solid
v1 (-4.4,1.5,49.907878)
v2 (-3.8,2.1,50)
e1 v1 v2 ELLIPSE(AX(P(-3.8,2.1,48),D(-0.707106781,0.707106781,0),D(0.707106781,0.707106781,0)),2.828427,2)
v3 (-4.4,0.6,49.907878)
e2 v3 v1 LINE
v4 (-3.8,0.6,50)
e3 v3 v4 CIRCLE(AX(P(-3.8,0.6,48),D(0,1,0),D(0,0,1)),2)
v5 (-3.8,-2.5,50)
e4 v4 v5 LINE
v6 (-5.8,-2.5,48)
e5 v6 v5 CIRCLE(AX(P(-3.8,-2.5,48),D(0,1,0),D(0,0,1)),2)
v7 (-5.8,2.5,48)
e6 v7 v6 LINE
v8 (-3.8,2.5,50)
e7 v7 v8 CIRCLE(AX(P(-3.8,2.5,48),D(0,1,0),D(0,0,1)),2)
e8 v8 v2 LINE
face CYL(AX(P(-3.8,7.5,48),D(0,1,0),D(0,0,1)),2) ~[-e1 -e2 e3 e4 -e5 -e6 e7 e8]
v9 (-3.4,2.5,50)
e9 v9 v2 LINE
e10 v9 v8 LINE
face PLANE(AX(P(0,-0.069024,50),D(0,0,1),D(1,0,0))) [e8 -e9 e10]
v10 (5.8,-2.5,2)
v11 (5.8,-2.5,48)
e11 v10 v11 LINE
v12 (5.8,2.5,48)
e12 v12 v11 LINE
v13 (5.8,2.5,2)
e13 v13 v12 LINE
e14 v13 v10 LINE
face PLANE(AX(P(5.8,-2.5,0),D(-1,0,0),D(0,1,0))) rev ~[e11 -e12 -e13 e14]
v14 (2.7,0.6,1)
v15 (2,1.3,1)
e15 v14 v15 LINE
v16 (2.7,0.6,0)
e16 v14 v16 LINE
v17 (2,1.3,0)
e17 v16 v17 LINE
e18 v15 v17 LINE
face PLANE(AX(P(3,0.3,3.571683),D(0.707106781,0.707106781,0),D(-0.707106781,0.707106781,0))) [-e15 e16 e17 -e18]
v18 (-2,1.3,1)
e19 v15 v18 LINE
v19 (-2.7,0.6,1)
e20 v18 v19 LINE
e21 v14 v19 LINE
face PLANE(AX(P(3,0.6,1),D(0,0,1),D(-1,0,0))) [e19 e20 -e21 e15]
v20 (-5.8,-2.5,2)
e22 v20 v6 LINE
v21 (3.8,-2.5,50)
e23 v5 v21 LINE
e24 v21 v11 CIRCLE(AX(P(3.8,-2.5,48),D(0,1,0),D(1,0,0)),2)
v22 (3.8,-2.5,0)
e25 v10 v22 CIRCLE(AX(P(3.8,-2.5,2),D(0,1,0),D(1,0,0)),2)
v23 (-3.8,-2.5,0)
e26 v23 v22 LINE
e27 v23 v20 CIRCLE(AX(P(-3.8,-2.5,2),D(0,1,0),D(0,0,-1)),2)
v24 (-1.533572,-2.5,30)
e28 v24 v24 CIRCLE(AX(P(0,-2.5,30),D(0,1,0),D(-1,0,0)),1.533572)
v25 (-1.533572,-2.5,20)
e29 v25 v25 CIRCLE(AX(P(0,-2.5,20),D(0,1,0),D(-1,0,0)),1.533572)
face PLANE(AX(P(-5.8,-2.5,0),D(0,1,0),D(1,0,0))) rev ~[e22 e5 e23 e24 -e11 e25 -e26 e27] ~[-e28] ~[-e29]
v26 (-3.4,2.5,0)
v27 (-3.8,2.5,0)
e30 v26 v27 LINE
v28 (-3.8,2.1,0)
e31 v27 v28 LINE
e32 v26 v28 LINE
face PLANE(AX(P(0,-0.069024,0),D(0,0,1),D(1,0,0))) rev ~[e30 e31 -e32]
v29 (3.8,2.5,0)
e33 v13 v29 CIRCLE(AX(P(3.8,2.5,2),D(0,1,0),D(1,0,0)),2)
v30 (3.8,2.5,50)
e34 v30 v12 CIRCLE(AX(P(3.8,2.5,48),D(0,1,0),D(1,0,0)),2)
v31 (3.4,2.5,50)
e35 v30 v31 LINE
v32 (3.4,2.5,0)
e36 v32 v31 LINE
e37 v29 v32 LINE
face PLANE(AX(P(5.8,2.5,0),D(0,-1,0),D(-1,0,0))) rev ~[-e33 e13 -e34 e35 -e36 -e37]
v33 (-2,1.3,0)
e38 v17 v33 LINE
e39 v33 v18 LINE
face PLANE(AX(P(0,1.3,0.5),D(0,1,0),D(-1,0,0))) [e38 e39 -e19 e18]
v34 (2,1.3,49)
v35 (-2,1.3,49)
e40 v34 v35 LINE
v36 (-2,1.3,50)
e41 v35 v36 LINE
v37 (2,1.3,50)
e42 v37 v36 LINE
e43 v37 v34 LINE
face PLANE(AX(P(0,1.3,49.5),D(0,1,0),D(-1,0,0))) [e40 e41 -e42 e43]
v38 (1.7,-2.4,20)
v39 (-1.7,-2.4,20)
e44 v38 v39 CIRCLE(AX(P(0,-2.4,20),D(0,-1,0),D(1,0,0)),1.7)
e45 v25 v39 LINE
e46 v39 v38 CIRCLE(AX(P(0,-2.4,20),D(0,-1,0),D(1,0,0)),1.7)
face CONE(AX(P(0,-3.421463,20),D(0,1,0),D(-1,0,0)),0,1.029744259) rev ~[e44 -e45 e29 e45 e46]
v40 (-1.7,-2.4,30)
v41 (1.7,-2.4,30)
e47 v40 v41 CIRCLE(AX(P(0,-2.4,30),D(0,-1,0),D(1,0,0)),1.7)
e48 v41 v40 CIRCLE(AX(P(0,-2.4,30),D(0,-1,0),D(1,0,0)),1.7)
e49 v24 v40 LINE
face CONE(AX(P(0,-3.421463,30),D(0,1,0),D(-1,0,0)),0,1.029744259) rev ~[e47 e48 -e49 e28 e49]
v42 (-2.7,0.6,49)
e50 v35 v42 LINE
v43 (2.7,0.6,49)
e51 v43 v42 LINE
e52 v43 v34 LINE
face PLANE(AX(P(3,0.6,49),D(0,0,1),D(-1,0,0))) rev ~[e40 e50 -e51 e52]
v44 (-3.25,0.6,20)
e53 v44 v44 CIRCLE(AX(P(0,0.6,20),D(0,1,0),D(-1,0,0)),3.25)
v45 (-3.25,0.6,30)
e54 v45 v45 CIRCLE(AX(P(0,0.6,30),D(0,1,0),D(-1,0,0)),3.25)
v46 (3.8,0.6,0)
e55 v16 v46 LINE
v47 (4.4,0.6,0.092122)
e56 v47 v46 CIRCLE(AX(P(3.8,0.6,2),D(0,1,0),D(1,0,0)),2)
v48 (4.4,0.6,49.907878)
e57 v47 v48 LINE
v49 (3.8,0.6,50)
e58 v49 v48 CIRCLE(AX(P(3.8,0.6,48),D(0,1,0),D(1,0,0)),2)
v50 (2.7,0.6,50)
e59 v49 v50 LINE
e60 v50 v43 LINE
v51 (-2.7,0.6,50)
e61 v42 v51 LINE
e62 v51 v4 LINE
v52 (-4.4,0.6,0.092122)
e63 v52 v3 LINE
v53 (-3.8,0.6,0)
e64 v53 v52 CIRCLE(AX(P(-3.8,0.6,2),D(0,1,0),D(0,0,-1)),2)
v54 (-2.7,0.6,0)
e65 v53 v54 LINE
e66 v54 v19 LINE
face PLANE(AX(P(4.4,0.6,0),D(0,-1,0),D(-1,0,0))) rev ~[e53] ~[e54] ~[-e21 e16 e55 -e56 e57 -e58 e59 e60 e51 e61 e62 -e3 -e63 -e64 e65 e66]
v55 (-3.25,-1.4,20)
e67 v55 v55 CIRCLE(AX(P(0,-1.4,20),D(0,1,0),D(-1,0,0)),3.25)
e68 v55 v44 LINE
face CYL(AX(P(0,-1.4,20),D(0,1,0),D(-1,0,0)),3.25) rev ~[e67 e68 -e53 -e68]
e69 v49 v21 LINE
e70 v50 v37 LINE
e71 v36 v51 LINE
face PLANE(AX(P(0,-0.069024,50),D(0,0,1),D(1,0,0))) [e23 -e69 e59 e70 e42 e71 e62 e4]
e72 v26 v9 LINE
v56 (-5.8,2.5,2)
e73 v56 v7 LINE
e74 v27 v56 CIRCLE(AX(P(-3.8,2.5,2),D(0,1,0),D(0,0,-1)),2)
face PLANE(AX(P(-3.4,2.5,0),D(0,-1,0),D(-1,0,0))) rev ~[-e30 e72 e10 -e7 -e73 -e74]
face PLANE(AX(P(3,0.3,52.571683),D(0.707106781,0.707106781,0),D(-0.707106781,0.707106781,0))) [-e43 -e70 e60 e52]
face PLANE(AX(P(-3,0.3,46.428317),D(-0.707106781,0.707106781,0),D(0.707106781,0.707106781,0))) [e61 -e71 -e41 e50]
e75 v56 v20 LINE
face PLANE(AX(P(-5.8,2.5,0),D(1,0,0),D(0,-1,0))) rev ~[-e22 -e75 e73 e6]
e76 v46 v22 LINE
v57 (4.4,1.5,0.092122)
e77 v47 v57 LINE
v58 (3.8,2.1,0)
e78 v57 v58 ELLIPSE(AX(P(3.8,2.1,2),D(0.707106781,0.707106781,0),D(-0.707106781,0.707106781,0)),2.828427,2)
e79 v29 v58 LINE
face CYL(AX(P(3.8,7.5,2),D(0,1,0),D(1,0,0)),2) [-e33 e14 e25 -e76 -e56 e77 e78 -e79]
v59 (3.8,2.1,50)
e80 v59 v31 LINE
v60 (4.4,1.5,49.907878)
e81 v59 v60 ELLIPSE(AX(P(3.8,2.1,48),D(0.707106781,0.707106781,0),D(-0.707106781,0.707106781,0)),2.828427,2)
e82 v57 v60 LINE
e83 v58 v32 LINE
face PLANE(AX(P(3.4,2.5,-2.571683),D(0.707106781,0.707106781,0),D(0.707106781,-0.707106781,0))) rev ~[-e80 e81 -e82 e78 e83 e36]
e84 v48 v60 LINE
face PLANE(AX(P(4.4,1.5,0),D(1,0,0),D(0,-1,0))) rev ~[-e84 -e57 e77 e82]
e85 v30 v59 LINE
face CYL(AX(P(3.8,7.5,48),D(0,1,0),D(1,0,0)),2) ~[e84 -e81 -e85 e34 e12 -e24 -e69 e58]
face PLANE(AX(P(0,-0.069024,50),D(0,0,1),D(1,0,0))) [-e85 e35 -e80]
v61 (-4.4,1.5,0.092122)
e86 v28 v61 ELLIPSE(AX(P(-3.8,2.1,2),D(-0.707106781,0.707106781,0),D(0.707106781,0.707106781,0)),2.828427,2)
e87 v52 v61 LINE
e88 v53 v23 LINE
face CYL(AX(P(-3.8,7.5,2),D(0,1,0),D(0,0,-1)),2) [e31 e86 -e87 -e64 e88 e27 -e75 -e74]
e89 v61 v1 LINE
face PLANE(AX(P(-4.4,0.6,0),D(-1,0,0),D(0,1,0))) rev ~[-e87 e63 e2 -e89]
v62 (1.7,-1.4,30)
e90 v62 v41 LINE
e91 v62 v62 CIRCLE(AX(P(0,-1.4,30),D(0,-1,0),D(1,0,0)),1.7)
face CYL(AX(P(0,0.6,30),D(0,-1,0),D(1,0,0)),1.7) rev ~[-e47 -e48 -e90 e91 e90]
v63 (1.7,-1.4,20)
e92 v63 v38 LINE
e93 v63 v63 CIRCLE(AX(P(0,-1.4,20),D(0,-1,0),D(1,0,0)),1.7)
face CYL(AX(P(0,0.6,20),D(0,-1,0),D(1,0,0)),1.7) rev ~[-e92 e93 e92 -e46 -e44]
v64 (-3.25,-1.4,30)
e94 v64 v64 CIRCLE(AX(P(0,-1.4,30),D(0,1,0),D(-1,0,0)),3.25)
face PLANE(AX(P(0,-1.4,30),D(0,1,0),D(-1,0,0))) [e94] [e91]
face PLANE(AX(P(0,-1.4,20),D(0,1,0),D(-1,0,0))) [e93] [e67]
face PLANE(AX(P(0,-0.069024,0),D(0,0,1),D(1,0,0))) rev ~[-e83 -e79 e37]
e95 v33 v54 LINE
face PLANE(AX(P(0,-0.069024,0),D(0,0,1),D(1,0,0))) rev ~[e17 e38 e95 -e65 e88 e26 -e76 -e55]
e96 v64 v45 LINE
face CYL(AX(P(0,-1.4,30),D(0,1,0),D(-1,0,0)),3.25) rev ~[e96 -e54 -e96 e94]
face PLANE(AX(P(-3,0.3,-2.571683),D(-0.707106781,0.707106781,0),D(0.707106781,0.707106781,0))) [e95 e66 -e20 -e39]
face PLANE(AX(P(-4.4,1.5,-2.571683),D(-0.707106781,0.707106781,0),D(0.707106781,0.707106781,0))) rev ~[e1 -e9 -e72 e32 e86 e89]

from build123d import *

# Parameters (mm, degrees)
F1_DEPTH       = 50
F3_D           = 3.4
F3_DEPTH       = 3
F3_CBORE_D     = 6.5
F3_CBORE_DEPTH = 2
F3_TIP         = 1.0214630523
F2_W           = 6
F2_H           = 1
F4_DEPTH       = 0.7
F5_T4_DEPTH    = 55.1433659759
F5_T9_DEPTH    = 55.1433659759
F5_T14_DEPTH   = 6.1433659759
F5_T19_DEPTH   = 6.1433659759
F5_T24_DEPTH   = 6.1433659759
F5_T29_DEPTH   = 6.1433659759
F6_T1_DEPTH    = 15


# Not quite as in the source:
# - a fillet or chamfer that OpenCascade refuses, or shapes differently, is made with other operations: its cross-section is extruded or revolved along the edge and cut away or added


with BuildPart() as f1:
    # F0 (on Top) → F1 (new body)
    with BuildSketch(Plane.XY):
        Polygon((-5.8, -2.5), (5.8, -2.5), (5.8, 2.5), (3.4, 2.5), (3.4, 1.5), (4.4, 1.5), (4.4, 0.6), (-4.4, 0.6), (-4.4, 1.5), (-3.4, 1.5), (-3.4, 2.5), (-5.8, 2.5), align=None)
    extrude(amount=F1_DEPTH)

    # F3
    with Locations(Plane(origin=(0, 0.6, 0), x_dir=(-1, 0, 0), z_dir=(0, 1, 0))):
        with Locations((0, 30), (0, 20)):
            CounterBoreHole(F3_D / 2, F3_CBORE_D / 2, F3_CBORE_DEPTH, depth=F3_DEPTH)
            with Locations((0, 0, -(F3_DEPTH + F3_TIP / 2))):  # 118° drill point
                Cone(0, F3_D / 2, F3_TIP, mode=Mode.SUBTRACT)

    # F2 (on face) → F4 (join)
    with BuildSketch(Plane(origin=(0, 0.6, 0), x_dir=(-1, 0, 0), z_dir=(0, 1, 0))):
        with Locations((0, 49.5)):
            Rectangle(F2_W, F2_H)
        with Locations((0, 0.5)):
            Rectangle(F2_W, F2_H)
    extrude(amount=F4_DEPTH)

    # F5: chamfer of 1 on 6 edges, made by hand


with BuildPart() as f5_tool2:
    # F5_s3 → F5_t4 (new body)
    with BuildSketch(Plane.XY.offset(-2.571682988)):
        Polygon((3.4, 2.5), (4.4, 1.5), (3.4, 1.5), align=None)
    extrude(amount=F5_T4_DEPTH)

    split(bisect_by=Plane.YZ.offset(4.4), keep=Keep.BOTTOM)


with BuildPart() as f1_1:
    add(f1.part)

    # F5_t1: cut F5_tool2
    add(f5_tool2.part, mode=Mode.SUBTRACT)


with BuildPart() as f5_tool7:
    # F5_s8 → F5_t9 (new body)
    with BuildSketch(Plane.XY.offset(-2.571682988)):
        Polygon((-4.4, 1.5), (-3.4, 2.5), (-3.4, 1.5), align=None)
    extrude(amount=F5_T9_DEPTH)

    split(bisect_by=Plane.YZ.offset(-4.4), keep=Keep.TOP)


with BuildPart() as f1_2:
    add(f1_1.part)

    # F5_t6: cut F5_tool7
    add(f5_tool7.part, mode=Mode.SUBTRACT)


with BuildPart() as f5_tool12:
    # F5_s13 → F5_t14 (new body)
    with BuildSketch(Plane.XY.offset(-2.571682988)):
        Polygon((-3, 0.3), (-2, 1.3), (-3, 1.3), align=None)
    extrude(amount=F5_T14_DEPTH)

    split(bisect_by=Plane.XZ.offset(-0.6), keep=Keep.BOTTOM)


with BuildPart() as f1_3:
    add(f1_2.part)

    # F5_t11: cut F5_tool12
    add(f5_tool12.part, mode=Mode.SUBTRACT)


with BuildPart() as f5_tool17:
    # F5_s18 → F5_t19 (new body)
    with BuildSketch(Plane.XY.offset(3.571682988)):
        Polygon((3, 0.3), (2, 1.3), (3, 1.3), align=None)
    extrude(amount=-F5_T19_DEPTH)

    split(bisect_by=Plane.XZ.offset(-0.6), keep=Keep.BOTTOM)


with BuildPart() as f1_4:
    add(f1_3.part)

    # F5_t16: cut F5_tool17
    add(f5_tool17.part, mode=Mode.SUBTRACT)


with BuildPart() as f5_tool22:
    # F5_s23 → F5_t24 (new body)
    with BuildSketch(Plane.XY.offset(52.571682988)):
        Polygon((3, 0.3), (2, 1.3), (3, 1.3), align=None)
    extrude(amount=-F5_T24_DEPTH)

    split(bisect_by=Plane.XZ.offset(-0.6), keep=Keep.BOTTOM)


with BuildPart() as f1_5:
    add(f1_4.part)

    # F5_t21: cut F5_tool22
    add(f5_tool22.part, mode=Mode.SUBTRACT)


with BuildPart() as f5_tool27:
    # F5_s28 → F5_t29 (new body)
    with BuildSketch(Plane.XY.offset(46.428317012)):
        Polygon((-3, 0.3), (-2, 1.3), (-3, 1.3), align=None)
    extrude(amount=F5_T29_DEPTH)

    split(bisect_by=Plane.XZ.offset(-0.6), keep=Keep.BOTTOM)


with BuildPart() as f1_6:
    add(f1_5.part)

    # F5_t26: cut F5_tool27
    add(f5_tool27.part, mode=Mode.SUBTRACT)

    # F6: fillet of radius 2 on 4 edges, made by hand

    # F6_s2 → F6_t1 (cut)
    with BuildSketch(Plane.XZ.offset(-7.5)):
        with BuildLine():
            ThreePointArc((5.8, 48), (5.2142135624, 49.4142135624), (3.8, 50))
            Line((3.8, 50), (5.8, 50))
            Line((5.8, 50), (5.8, 48))
        make_face()
        with BuildLine():
            ThreePointArc((-3.8, 50), (-5.2142135624, 49.4142135624), (-5.8, 48))
            Line((-5.8, 48), (-5.8, 50))
            Line((-5.8, 50), (-3.8, 50))
        make_face()
        with BuildLine():
            ThreePointArc((-3.8, 0), (-5.2142135624, 0.5857864376), (-5.8, 2))
            Line((-5.8, 2), (-5.8, 0))
            Line((-5.8, 0), (-3.8, 0))
        make_face()
        with BuildLine():
            ThreePointArc((5.8, 2), (5.2142135624, 0.5857864376), (3.8, 0))
            Line((3.8, 0), (5.8, 0))
            Line((5.8, 0), (5.8, 2))
        make_face()
    extrude(amount=F6_T1_DEPTH, mode=Mode.SUBTRACT)


solid = f1_6.part
